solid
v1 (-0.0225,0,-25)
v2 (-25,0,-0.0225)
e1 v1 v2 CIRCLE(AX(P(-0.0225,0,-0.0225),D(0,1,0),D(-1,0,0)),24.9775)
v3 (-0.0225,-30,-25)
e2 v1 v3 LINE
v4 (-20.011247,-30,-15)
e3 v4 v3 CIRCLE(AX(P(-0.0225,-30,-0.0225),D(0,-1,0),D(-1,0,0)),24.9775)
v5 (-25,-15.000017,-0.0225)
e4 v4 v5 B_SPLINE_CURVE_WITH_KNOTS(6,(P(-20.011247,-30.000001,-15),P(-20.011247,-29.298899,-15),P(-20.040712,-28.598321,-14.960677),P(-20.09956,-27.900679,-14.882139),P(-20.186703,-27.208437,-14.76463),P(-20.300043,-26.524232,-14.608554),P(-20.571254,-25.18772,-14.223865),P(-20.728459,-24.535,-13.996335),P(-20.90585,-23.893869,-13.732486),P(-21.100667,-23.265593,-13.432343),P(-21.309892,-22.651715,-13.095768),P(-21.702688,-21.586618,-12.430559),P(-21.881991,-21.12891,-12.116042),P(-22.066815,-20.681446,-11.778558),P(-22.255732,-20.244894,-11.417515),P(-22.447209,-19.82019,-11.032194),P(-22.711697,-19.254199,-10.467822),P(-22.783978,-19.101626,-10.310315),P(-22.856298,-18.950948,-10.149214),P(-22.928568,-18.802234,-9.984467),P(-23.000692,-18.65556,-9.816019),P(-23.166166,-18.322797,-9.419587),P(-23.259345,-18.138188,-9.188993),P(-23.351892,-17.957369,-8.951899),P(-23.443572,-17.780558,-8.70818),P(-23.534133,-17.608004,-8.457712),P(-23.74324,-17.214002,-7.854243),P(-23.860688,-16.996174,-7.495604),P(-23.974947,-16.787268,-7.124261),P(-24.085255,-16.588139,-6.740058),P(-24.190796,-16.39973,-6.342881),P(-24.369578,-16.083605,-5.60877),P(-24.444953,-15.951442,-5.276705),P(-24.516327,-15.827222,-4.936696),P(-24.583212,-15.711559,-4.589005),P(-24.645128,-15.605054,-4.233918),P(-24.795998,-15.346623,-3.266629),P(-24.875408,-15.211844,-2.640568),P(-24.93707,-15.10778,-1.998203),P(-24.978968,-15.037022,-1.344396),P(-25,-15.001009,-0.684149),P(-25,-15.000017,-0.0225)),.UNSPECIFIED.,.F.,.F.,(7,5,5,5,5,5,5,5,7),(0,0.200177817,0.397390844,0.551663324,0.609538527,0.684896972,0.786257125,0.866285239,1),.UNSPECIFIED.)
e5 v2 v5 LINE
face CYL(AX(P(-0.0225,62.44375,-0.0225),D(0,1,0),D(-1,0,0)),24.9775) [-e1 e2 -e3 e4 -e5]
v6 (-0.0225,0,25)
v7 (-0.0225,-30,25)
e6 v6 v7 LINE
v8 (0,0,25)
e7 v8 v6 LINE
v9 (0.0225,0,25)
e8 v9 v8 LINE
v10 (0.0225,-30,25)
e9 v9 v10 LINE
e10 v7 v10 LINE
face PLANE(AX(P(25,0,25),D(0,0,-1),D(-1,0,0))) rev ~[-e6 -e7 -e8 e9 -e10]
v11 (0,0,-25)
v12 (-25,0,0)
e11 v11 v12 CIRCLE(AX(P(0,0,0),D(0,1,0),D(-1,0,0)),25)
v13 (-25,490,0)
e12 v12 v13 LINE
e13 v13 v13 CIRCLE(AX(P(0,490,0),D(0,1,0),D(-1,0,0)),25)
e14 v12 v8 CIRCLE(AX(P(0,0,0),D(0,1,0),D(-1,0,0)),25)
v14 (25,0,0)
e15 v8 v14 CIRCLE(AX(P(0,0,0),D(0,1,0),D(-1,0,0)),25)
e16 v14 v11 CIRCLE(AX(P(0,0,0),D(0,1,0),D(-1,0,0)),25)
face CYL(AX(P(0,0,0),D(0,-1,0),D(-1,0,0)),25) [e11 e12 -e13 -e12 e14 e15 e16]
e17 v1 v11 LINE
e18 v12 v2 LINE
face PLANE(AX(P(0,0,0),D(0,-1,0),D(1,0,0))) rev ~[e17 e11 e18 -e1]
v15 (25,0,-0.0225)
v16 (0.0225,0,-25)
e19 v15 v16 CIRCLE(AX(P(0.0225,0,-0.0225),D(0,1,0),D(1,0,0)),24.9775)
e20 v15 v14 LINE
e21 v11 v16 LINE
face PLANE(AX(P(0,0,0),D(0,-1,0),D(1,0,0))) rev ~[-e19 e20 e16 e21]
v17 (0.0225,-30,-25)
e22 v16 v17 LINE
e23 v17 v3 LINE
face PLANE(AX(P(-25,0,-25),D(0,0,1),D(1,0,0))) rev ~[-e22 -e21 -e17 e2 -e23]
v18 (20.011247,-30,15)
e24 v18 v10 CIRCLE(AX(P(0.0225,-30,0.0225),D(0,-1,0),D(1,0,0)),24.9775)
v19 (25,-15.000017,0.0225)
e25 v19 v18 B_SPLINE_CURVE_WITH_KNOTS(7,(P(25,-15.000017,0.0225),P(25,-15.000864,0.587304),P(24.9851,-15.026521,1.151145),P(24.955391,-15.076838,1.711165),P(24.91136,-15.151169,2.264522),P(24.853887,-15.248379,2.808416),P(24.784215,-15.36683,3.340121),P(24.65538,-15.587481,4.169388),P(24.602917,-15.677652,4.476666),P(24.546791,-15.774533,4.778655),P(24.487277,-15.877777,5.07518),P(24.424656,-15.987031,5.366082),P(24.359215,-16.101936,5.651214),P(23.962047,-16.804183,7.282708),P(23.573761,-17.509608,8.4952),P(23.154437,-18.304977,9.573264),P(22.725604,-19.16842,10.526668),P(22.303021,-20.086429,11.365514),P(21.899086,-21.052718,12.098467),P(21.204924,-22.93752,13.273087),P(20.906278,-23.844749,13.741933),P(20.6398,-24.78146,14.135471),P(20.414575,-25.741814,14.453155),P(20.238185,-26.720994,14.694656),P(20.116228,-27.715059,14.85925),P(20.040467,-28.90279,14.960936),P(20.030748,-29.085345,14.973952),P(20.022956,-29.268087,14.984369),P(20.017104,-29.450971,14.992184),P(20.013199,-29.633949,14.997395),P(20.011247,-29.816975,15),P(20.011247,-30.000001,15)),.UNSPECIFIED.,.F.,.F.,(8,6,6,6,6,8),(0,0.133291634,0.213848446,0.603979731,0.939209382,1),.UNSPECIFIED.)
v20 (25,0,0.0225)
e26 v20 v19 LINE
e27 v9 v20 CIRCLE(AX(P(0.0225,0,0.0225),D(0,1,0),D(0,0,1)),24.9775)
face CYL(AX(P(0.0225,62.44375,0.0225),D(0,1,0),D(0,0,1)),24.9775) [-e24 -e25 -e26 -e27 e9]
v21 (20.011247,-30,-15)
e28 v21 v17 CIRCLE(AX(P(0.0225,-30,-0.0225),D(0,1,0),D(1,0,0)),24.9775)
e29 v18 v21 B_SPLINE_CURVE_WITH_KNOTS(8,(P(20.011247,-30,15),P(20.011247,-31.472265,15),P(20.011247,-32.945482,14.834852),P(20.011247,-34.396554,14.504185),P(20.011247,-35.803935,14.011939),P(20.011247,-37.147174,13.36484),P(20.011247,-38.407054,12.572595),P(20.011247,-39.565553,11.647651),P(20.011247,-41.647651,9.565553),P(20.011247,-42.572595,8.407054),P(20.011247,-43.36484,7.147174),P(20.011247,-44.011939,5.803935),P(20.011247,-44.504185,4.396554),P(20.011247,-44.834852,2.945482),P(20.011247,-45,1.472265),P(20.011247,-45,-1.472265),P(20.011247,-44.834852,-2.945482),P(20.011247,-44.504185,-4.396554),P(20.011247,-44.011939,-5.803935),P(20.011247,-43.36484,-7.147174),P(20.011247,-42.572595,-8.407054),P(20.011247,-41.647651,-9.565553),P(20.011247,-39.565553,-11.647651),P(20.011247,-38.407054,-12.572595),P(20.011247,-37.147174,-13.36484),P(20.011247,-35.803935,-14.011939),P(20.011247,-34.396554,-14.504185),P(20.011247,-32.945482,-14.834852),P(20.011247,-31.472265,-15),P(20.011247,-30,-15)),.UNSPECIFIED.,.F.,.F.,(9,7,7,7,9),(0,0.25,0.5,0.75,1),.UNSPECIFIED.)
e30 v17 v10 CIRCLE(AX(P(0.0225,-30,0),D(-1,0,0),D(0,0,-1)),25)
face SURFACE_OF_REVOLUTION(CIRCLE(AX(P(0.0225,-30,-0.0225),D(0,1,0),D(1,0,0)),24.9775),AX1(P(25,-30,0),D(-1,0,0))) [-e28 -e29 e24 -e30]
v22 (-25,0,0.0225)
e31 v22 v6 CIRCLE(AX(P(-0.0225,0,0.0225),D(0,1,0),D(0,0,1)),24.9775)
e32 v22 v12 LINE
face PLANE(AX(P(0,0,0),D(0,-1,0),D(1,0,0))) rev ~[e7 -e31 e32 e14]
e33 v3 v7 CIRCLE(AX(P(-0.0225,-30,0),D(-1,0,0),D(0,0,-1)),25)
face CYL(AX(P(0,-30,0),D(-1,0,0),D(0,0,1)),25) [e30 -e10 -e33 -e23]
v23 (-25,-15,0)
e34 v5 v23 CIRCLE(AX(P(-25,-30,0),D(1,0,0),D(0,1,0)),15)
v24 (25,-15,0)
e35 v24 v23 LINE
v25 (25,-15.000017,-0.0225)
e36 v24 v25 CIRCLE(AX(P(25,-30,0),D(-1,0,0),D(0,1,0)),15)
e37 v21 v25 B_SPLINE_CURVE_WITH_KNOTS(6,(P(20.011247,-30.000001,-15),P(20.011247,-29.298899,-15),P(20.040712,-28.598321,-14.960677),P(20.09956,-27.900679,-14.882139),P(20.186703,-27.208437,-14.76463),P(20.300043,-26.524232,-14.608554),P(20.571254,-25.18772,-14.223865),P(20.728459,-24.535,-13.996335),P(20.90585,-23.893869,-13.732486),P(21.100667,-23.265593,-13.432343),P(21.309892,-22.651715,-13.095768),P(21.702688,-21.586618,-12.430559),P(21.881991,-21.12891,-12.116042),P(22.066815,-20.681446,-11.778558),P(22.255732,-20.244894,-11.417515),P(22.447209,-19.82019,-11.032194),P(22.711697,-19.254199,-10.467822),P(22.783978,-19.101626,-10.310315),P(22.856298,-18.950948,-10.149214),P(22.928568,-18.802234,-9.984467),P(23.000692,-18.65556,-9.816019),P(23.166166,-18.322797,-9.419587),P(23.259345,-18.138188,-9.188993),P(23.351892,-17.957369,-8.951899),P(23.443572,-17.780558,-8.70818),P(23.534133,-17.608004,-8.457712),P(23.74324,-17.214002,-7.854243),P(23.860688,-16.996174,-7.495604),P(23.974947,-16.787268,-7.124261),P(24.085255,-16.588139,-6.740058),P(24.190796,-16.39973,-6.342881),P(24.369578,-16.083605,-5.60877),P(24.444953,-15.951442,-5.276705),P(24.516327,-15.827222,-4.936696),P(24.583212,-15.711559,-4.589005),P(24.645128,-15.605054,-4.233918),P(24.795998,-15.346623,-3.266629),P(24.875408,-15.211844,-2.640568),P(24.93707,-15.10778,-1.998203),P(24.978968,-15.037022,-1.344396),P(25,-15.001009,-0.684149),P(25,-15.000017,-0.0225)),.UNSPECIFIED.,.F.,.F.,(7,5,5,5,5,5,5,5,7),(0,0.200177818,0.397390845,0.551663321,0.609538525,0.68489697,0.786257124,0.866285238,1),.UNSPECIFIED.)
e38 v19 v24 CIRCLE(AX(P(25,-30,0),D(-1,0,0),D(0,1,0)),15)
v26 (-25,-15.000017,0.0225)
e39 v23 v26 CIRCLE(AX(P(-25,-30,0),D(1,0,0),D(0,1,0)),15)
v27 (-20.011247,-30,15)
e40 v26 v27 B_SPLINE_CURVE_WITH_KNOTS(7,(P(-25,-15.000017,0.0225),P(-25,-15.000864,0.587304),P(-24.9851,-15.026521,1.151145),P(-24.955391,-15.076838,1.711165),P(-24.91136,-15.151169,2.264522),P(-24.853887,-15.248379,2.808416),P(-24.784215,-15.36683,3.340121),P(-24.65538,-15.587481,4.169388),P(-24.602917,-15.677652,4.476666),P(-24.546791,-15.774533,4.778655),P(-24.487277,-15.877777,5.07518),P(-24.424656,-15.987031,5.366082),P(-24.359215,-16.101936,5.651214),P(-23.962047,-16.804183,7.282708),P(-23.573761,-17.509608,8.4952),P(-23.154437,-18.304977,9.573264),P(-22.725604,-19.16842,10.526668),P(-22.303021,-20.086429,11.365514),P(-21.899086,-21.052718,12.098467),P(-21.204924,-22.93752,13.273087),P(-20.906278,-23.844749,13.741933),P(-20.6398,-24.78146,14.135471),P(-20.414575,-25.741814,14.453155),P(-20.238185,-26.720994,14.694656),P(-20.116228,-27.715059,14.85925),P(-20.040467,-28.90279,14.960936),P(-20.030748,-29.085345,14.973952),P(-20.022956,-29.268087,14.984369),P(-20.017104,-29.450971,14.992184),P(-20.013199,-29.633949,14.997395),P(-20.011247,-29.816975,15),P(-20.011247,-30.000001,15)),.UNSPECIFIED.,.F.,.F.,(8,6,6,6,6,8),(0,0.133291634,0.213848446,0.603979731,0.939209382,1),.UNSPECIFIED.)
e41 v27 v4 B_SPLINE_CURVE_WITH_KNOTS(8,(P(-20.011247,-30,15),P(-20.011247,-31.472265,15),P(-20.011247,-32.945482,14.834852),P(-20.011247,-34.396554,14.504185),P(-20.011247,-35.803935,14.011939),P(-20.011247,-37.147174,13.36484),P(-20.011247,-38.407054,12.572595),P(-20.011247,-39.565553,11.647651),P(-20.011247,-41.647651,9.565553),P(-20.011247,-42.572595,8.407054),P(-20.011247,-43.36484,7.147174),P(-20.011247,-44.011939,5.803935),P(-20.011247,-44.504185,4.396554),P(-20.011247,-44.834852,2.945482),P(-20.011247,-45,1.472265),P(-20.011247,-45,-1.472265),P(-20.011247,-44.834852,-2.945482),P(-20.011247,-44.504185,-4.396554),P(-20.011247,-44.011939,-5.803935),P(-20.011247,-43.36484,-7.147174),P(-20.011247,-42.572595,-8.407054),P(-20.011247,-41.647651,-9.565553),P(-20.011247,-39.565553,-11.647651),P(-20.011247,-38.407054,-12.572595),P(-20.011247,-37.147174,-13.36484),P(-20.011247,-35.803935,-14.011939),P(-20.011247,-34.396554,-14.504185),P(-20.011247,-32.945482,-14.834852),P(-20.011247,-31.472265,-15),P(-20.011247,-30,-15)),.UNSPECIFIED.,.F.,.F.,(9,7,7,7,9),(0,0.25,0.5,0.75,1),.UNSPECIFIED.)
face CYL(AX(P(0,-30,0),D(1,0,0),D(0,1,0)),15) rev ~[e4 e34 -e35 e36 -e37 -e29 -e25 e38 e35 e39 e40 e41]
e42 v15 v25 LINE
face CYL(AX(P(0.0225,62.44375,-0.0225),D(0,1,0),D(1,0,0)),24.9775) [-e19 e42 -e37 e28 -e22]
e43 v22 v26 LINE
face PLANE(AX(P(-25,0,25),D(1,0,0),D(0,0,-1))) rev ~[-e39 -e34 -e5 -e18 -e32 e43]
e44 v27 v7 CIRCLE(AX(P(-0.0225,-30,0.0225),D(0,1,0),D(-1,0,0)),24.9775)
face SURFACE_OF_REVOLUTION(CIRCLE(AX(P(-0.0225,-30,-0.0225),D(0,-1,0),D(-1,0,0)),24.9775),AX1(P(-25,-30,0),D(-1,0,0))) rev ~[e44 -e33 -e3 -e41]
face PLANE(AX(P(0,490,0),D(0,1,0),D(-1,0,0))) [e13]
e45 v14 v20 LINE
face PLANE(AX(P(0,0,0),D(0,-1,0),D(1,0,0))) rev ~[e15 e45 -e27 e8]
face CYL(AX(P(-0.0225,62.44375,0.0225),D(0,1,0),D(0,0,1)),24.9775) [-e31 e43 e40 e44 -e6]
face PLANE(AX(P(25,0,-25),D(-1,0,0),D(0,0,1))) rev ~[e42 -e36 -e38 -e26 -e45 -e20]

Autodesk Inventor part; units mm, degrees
ref_plane "XZ Plane" through (0, 0, 0) normal (0, 1, 0) x (-1, 0, 0)
ref_plane "XY Plane" through (0, 0, 0) normal (0, 0, 1) x (1, 0, 0)
sketch "Sketch1" plane through (0, 0, 0) normal (0, 1, 0) x (-1, 0, 0)
  circle A0 centre (0, 0) radius 25
  dimension "d0" = 50
extrude "Extrusion1" add sketch "Sketch1" along normal blind 490
sketch "Sketch2" plane through (0, 0, 0) normal (0, -1, 0) x (1, 0, 0)
  line L0 (-25, -25) -> (25, -25)
  line L1 (25, -25) -> (25, 25)
  line L2 (25, 25) -> (-25, 25)
  line L3 (-25, 25) -> (-25, -25)
  point P0 (0, 0)
extrude "Extrusion2" add sketch "Sketch2" along normal blind 60
sketch "Sketch3" plane through (0, 0, 0) normal (1, 0, 0) x (0, 1, 0)
  circle A0 centre (-30, 0) radius 15
  line L0 (0, -25) -> (0, 0) projected
  line L1 (0, 25) -> (-60, 25) projected
  line L2 (0, -25) -> (-60, -25) projected
  arc A1 (-30, 25) -> (-30, -25) centre (-30, 0) ccw
  line L3 (-30, 25) -> (-30, 40.1158)
  line L4 (-30, 40.1158) -> (-76.6193, 40.1158)
  line L5 (-76.6193, 40.1158) -> (-77.4473, -45.6375)
  line L6 (-77.4473, -45.6375) -> (-35.1048, -45.6375)
  line L7 (-35.1048, -45.6375) -> (-30, -25)
  dimension "d5" = 30
  dimension "d6" = 30
extrude "Extrusion3" cut sketch "Sketch3" along normal mid plane 100
fillet "Fillet1" radius 24.9775 6 edges at (25, -55, 0) (25, -15, -25) (25, -15, 25) (-25, -55, 0) (-25, -15, -25) (-25, -15, 25)
sketch "Sketch4" plane through (0, 0, 0) normal (1, 0, 0) x (0, 1, 0)
  line L0 (16.2777, 47.2828) -> (16.2777, -82.9386)
  point P0 (0, 0)
properties part number "Piston_Bom"
